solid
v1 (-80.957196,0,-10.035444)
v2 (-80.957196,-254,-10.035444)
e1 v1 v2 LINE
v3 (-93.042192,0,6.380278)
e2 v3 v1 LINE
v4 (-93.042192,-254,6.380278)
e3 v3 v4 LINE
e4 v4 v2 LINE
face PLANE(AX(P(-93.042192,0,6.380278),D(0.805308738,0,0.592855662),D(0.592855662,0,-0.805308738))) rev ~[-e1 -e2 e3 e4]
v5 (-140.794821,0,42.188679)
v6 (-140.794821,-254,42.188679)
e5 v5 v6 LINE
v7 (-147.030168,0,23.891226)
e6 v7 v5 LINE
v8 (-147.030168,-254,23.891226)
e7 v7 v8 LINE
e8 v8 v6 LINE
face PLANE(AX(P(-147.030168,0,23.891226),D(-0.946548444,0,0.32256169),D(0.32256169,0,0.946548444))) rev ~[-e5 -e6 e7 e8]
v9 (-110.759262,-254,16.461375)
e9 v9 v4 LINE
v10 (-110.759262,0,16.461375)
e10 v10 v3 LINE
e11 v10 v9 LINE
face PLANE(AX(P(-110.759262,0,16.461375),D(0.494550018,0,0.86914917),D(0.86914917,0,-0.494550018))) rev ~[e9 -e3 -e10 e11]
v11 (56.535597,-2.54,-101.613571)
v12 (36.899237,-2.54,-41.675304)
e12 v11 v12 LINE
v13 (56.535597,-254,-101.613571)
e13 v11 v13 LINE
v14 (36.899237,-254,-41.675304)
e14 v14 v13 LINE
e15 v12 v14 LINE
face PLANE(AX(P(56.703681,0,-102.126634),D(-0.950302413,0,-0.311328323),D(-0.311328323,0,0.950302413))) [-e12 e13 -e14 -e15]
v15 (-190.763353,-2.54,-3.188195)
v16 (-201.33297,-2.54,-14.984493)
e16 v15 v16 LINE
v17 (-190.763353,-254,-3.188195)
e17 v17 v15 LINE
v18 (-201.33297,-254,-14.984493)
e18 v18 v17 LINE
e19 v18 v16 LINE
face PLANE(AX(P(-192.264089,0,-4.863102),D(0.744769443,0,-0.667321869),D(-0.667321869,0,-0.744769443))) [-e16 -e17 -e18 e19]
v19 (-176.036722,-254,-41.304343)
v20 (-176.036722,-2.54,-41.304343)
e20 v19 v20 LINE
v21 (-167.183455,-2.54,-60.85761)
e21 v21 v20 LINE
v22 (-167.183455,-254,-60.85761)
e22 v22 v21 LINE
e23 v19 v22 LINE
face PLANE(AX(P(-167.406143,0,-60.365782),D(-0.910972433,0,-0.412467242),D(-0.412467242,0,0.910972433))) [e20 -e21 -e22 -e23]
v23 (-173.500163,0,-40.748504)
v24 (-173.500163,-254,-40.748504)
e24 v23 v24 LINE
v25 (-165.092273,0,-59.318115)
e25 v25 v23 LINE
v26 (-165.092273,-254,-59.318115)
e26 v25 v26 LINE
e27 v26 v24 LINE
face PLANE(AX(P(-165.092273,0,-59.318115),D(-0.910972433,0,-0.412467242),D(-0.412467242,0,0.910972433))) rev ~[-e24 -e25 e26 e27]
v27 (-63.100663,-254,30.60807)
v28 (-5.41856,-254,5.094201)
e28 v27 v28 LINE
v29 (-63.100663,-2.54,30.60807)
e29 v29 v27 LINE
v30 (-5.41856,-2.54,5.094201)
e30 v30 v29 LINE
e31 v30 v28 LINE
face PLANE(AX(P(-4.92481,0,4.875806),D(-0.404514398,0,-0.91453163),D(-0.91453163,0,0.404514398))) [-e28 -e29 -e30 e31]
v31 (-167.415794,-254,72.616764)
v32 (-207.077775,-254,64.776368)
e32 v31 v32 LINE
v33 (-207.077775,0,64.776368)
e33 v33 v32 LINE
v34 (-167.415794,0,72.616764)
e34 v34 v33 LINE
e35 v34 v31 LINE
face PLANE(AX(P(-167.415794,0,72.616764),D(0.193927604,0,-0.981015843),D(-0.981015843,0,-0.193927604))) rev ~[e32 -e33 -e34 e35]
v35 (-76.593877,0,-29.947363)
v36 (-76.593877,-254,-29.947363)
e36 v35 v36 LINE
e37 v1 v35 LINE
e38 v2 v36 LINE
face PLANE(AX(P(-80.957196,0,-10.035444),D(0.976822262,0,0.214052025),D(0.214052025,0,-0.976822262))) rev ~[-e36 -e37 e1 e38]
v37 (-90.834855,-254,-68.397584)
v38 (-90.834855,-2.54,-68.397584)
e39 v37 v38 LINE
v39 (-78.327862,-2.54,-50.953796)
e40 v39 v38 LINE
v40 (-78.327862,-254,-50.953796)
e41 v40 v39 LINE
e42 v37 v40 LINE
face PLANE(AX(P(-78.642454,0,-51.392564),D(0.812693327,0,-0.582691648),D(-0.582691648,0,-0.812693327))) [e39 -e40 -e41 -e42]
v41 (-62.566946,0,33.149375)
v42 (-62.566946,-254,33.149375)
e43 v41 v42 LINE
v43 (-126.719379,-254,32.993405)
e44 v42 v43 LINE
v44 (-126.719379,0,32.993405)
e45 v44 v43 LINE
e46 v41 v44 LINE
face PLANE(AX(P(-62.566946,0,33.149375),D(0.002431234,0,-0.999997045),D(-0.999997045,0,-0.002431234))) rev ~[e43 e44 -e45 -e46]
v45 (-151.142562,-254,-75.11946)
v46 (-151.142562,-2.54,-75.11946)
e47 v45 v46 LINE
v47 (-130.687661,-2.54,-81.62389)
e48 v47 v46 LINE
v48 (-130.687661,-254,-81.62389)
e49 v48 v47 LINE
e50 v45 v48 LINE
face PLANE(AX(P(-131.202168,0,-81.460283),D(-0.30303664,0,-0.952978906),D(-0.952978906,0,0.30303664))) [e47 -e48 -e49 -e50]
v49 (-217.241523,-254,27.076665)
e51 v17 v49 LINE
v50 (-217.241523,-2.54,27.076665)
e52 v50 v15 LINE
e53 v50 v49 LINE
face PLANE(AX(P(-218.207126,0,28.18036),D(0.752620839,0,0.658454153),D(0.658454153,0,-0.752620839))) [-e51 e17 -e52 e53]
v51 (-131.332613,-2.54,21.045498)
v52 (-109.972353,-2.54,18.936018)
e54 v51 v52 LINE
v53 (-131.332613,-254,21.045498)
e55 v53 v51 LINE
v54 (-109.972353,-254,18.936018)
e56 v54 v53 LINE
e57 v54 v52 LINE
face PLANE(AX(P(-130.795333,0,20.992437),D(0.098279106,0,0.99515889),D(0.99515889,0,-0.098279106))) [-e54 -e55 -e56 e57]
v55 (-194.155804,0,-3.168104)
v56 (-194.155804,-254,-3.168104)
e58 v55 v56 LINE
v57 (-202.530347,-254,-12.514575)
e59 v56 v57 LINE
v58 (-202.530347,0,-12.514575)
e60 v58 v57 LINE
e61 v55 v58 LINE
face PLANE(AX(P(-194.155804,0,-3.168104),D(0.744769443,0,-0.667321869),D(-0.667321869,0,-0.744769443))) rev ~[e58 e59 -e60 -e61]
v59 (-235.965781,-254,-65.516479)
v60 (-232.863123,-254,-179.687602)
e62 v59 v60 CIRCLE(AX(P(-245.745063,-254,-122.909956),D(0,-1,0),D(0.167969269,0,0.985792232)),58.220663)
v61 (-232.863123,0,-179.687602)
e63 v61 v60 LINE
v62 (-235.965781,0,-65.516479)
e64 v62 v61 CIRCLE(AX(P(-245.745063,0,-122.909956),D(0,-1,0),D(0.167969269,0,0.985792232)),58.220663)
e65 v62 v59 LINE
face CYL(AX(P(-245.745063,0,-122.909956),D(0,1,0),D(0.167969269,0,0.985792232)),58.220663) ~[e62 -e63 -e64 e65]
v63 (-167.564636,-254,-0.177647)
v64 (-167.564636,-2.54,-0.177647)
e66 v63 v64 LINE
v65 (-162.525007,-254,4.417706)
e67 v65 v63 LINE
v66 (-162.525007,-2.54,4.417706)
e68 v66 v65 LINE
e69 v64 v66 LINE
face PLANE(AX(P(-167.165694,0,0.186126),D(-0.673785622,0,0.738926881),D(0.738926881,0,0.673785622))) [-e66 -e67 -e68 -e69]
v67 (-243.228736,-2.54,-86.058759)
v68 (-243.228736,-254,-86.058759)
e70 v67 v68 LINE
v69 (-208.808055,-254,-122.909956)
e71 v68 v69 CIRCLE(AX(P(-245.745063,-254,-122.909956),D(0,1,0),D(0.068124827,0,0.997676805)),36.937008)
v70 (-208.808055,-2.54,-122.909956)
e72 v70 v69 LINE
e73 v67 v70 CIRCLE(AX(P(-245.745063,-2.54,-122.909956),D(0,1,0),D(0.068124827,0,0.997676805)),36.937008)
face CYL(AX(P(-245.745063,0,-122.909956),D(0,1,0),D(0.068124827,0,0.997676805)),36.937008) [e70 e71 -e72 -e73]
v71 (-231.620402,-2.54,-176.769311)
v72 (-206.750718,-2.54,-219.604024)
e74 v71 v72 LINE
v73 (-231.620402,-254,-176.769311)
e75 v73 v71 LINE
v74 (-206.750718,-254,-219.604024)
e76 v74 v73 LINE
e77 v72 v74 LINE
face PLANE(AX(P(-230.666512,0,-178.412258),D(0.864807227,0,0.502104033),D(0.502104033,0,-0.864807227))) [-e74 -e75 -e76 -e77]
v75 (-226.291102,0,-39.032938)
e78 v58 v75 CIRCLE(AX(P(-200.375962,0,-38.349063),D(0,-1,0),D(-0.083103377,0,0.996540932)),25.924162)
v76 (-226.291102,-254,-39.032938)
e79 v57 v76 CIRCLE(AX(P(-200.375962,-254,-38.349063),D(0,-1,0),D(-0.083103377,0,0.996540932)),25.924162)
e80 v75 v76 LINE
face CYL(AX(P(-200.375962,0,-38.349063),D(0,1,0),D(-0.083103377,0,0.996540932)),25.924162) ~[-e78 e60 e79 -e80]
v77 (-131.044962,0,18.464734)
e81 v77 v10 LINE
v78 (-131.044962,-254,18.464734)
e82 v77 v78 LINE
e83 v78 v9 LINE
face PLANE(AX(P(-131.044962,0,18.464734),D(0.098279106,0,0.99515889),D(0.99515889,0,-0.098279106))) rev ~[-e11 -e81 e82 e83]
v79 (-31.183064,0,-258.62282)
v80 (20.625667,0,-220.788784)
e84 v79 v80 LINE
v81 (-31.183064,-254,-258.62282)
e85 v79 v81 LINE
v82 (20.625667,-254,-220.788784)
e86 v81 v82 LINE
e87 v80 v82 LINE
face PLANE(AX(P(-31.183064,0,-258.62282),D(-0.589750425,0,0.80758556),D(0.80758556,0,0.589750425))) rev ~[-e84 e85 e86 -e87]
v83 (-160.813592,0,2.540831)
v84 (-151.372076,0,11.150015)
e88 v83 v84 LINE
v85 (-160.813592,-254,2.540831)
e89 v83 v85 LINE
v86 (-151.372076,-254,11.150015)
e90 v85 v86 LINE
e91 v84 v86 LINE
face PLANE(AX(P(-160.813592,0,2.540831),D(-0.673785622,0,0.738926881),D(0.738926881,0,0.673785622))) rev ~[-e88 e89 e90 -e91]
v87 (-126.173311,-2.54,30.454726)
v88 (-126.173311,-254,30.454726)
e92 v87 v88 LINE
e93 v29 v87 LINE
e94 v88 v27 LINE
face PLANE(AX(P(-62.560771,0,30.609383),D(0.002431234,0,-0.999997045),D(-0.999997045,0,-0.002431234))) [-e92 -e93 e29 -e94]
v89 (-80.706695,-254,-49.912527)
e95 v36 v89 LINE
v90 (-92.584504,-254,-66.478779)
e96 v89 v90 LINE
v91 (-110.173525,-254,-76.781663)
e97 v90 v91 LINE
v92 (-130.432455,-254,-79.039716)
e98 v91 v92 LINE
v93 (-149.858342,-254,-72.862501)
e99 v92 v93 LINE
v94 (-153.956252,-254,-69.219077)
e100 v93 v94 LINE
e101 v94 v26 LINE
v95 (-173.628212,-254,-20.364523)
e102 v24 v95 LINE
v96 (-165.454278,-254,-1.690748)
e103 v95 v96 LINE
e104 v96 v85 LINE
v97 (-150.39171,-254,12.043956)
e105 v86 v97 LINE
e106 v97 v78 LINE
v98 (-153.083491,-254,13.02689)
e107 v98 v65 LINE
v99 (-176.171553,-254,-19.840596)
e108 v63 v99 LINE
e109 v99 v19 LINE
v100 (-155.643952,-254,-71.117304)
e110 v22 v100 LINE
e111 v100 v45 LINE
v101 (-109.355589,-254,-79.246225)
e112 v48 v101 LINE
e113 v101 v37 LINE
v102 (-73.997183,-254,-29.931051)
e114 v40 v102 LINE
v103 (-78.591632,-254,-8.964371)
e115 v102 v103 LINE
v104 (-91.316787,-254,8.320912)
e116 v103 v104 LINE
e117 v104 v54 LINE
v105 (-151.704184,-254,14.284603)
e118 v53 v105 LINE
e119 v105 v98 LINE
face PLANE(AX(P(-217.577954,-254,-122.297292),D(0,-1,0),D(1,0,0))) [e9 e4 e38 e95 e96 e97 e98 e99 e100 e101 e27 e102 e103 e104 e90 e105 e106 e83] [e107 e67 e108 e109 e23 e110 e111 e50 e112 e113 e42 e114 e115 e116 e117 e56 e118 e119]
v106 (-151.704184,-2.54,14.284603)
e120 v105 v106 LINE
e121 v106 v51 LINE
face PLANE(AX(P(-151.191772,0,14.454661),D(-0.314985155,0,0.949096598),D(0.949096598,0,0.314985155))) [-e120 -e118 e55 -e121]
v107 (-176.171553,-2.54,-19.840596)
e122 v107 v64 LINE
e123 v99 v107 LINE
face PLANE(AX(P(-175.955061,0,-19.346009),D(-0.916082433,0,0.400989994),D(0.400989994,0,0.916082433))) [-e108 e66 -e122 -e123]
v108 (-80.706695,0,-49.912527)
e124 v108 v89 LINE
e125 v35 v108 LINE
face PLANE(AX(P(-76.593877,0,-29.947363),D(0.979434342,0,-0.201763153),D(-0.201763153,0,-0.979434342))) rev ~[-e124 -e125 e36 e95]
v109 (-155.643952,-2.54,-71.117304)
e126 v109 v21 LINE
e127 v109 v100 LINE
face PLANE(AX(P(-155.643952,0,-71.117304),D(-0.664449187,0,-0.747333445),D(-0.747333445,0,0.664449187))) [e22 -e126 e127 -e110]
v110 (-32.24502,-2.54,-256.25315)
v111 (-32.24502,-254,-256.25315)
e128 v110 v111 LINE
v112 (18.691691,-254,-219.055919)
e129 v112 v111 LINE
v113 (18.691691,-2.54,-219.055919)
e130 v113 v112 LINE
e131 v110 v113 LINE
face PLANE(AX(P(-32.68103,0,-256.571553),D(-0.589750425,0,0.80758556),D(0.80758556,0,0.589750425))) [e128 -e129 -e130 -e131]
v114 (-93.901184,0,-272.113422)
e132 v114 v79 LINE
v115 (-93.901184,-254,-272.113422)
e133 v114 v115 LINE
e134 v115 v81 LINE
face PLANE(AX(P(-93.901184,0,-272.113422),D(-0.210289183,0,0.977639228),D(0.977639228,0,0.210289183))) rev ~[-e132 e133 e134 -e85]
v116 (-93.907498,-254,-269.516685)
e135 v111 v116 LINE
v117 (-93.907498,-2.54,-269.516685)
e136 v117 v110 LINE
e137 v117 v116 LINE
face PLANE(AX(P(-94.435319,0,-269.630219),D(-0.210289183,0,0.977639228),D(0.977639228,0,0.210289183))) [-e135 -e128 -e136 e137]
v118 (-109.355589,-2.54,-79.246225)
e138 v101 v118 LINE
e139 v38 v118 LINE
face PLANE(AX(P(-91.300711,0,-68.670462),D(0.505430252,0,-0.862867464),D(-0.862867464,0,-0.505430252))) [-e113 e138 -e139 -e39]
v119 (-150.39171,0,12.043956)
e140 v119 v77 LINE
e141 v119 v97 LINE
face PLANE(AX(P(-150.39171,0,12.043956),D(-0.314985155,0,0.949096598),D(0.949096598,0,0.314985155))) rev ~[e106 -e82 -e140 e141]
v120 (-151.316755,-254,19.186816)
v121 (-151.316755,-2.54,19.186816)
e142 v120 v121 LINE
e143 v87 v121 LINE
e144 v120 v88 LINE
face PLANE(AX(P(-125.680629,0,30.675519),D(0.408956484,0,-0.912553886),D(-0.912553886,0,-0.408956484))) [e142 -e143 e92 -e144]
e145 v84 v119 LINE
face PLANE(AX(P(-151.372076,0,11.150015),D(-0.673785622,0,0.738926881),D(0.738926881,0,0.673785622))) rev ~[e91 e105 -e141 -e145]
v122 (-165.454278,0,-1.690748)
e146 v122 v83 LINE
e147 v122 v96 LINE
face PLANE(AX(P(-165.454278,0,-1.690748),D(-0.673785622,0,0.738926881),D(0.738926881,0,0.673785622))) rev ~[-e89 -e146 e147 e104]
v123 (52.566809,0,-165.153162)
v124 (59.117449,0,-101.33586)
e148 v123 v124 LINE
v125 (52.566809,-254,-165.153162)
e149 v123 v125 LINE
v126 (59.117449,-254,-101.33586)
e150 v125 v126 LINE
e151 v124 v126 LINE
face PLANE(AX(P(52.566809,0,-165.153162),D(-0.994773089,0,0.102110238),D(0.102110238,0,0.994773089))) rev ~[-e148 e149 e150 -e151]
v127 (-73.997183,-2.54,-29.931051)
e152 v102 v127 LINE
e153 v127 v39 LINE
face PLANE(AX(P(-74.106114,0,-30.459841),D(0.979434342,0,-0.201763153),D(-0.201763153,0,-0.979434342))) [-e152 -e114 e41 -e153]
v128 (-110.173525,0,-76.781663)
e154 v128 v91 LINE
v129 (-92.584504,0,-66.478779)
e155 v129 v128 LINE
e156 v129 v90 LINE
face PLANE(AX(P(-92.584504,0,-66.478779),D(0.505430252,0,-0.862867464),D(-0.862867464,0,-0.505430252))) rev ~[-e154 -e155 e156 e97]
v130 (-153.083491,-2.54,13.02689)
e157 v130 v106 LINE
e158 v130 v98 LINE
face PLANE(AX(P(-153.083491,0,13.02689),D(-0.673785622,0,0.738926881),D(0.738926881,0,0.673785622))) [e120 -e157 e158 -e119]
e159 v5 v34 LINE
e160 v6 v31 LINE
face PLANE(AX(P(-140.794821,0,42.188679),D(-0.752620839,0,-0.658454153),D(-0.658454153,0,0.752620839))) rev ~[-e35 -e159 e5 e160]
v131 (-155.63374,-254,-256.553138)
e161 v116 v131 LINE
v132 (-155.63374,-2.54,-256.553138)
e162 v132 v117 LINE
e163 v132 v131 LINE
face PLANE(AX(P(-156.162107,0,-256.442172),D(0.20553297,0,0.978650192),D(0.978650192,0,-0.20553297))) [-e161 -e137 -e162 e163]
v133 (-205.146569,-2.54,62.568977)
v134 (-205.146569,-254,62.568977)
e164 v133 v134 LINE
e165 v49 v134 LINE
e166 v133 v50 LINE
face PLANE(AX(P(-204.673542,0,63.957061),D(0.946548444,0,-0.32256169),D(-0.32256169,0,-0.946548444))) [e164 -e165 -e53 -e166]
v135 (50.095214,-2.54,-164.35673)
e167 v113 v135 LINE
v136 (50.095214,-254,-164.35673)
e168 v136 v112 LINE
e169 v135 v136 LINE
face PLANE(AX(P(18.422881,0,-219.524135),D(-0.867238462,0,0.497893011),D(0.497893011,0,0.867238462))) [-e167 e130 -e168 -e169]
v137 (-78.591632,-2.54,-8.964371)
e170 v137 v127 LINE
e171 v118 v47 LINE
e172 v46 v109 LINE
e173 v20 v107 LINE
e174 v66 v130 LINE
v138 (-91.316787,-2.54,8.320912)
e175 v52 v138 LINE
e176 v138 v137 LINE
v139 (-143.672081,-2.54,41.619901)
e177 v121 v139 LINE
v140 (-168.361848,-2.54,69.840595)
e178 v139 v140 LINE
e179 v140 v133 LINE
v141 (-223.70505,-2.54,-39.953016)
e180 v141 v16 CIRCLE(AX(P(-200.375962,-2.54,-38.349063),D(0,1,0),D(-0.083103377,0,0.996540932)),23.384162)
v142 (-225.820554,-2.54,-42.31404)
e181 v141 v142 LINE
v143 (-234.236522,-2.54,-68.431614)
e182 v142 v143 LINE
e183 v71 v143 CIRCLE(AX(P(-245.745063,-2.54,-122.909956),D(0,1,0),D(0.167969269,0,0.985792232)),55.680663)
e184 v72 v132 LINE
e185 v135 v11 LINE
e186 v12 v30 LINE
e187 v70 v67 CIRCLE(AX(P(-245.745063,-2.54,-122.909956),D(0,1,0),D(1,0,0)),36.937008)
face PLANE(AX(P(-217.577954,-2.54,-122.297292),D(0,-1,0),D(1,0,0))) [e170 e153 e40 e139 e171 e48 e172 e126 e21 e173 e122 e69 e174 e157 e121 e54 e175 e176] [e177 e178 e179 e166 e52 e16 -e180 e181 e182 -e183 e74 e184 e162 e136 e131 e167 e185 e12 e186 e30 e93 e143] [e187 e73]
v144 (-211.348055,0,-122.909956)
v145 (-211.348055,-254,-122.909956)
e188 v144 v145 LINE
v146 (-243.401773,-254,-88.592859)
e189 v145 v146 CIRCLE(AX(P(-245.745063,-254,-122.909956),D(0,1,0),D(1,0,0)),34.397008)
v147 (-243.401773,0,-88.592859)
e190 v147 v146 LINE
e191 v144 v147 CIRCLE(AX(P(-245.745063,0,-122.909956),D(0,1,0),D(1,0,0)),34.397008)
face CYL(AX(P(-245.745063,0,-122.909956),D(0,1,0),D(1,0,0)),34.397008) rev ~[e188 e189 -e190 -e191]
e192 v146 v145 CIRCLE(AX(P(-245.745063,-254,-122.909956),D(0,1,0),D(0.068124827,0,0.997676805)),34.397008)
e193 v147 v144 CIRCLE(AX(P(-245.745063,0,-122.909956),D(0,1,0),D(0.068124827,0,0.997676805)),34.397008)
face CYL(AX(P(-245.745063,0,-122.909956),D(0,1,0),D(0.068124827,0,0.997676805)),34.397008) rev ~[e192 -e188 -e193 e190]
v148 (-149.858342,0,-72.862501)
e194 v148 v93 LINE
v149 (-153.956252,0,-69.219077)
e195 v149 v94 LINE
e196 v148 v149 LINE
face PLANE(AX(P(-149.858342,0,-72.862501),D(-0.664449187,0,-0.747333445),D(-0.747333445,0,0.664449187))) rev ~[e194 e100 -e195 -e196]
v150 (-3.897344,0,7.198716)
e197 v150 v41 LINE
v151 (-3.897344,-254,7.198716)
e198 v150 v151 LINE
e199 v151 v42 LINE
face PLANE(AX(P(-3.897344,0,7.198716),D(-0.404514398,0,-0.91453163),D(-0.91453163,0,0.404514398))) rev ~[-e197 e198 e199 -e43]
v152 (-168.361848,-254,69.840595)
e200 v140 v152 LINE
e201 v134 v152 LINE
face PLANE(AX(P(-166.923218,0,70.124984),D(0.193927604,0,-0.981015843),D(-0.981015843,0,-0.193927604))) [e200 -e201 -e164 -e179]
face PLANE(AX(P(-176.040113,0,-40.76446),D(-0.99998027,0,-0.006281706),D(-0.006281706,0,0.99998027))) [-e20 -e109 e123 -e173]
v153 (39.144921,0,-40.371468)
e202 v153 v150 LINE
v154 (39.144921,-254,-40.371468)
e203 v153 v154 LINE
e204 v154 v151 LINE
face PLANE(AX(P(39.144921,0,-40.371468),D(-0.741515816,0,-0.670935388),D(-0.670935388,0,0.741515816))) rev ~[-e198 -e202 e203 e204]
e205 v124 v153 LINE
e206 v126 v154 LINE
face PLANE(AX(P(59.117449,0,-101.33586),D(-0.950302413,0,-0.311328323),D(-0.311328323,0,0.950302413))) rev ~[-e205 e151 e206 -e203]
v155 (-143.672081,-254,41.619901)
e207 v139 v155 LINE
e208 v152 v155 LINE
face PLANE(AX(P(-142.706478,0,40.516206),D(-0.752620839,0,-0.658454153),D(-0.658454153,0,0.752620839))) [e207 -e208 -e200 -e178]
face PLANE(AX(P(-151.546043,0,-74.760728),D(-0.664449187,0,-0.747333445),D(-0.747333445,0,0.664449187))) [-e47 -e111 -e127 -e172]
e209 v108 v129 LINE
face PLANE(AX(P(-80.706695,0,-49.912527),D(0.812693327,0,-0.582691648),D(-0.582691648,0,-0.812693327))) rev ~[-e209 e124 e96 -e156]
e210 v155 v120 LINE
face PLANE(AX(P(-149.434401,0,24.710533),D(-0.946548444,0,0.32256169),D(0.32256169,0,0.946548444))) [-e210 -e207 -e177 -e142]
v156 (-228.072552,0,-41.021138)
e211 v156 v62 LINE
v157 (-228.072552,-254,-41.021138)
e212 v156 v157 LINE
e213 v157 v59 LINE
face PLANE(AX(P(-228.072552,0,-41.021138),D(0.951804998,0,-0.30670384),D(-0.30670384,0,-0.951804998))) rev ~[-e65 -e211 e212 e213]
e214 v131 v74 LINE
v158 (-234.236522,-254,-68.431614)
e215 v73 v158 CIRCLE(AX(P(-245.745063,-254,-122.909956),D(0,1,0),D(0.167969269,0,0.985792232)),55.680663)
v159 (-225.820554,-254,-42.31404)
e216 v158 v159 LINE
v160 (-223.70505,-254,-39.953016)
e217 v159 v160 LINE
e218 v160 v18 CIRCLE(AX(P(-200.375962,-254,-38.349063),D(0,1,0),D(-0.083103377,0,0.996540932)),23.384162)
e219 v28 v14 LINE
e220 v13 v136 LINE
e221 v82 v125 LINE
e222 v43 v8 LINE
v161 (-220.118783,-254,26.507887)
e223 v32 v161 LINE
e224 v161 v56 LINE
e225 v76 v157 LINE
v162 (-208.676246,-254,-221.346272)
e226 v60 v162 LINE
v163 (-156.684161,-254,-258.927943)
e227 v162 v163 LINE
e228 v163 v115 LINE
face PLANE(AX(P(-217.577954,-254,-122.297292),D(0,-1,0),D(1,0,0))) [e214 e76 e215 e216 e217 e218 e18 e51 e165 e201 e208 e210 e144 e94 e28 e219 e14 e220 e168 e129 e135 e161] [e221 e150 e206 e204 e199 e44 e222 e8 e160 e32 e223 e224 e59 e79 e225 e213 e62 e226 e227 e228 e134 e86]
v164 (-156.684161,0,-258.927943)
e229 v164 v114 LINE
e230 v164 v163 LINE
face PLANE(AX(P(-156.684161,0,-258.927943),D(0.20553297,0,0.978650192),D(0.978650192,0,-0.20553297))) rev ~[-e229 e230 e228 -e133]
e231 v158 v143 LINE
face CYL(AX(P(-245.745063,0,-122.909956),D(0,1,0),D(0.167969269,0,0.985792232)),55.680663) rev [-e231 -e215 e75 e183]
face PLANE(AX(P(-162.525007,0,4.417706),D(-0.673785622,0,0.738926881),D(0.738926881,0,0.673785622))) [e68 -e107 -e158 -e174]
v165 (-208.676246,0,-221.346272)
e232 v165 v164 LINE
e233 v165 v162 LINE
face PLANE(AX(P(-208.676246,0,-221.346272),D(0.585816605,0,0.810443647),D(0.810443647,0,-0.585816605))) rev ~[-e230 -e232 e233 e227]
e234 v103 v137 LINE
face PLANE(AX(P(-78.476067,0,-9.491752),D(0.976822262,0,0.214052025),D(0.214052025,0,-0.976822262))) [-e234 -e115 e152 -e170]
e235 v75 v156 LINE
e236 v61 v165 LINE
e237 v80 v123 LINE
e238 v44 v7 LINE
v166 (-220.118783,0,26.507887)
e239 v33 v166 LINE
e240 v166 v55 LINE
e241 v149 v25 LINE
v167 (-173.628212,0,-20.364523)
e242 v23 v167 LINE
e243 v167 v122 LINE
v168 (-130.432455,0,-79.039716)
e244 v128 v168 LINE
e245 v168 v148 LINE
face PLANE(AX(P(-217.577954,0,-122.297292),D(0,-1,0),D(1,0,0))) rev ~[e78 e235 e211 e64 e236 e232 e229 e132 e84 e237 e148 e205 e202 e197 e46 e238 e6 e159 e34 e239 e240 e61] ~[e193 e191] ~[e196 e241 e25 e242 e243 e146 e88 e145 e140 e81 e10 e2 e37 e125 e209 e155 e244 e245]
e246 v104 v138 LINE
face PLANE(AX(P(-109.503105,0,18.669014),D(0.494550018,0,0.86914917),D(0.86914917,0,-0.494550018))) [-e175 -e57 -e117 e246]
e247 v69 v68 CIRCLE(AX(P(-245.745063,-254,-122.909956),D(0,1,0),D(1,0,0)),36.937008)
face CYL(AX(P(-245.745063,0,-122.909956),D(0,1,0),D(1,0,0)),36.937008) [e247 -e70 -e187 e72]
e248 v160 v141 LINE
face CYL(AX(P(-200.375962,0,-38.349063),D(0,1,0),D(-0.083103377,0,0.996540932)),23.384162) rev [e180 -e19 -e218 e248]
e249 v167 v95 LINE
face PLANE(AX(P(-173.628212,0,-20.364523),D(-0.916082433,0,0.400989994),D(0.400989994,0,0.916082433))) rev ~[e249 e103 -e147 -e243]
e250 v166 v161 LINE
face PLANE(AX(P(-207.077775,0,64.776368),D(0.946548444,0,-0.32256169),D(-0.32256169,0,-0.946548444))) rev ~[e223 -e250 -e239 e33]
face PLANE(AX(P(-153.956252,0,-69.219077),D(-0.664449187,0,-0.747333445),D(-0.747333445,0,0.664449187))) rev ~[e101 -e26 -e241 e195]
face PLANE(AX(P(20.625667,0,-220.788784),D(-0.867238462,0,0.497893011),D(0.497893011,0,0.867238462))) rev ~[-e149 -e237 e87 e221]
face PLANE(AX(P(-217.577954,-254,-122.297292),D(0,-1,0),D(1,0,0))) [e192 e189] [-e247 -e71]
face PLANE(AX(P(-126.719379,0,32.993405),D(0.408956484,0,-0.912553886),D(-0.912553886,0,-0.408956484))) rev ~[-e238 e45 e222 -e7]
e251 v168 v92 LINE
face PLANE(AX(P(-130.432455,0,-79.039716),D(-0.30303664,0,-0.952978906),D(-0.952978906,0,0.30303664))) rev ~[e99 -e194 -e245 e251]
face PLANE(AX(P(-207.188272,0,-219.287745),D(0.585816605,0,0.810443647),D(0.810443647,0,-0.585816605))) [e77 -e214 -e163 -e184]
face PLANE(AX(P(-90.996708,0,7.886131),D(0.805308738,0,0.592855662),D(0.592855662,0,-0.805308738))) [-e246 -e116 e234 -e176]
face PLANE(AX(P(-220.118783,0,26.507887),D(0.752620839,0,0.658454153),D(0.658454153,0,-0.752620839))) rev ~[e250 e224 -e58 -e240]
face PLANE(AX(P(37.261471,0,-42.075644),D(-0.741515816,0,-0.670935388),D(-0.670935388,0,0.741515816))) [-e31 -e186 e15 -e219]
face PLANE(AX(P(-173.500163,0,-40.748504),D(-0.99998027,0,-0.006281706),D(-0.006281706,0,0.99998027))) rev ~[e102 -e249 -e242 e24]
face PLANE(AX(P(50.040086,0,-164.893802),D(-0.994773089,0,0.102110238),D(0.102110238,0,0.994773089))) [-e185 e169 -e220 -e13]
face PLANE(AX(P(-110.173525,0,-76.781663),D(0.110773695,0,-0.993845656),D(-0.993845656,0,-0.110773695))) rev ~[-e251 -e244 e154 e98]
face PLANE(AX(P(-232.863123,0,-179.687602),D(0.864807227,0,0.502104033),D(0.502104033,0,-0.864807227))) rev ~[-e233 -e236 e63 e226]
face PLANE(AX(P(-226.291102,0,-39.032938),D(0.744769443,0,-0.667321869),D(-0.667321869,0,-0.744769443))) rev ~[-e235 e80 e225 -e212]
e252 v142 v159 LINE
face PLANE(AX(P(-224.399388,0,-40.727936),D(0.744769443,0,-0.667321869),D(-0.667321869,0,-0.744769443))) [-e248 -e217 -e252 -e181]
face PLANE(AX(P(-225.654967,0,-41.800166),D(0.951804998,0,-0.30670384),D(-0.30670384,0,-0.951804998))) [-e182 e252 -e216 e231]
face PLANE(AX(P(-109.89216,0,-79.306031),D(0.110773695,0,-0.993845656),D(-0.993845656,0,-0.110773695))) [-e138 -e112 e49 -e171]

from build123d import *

# Parameters (mm, degrees)
F1_DEPTH = 254
F2_T     = -2.54


with BuildPart() as f1:
    # F0 (on Front) → F1 (new body)
    with BuildSketch(Plane.XZ):
        with BuildLine():
            ThreePointArc((-243.4017726194, -88.5928585449), (-220.6078758628, -99.4306883092), (-211.3480547487, -122.9099556804))
            ThreePointArc((-211.3480547487, -122.9099556804), (-220.0765697788, -145.8071744938), (-241.8322543151, -157.0836896635))
            Line((-241.8322543151, -157.0836896635), (-240.887536248, -165.8666205301))
            Line((-240.887536248, -165.8666205301), (-232.8631227599, -179.6876024772))
            ThreePointArc((-232.8631227599, -179.6876024772), (-200.2497848188, -159.2393547198), (-187.5244002098, -122.9099556804))
            ThreePointArc((-187.5244002098, -122.9099556804), (-201.2534802405, -85.358063124), (-235.9657806801, -65.5164787306))
            Line((-235.9657806801, -65.5164787306), (-243.4017726194, -88.5928585449))
        make_face()
        with BuildLine():
            ThreePointArc((-241.8322543151, -157.0836896635), (-280.1330429902, -123.6979818064), (-243.4017726194, -88.5928585449))
            Line((-243.4017726194, -88.5928585449), (-235.9657806801, -65.5164787306))
            ThreePointArc((-235.9657806801, -65.5164787306), (-303.9442391321, -124.4915476748), (-232.8631227599, -179.6876024772))
            Line((-232.8631227599, -179.6876024772), (-240.887536248, -165.8666205301))
            Line((-240.887536248, -165.8666205301), (-241.8322543151, -157.0836896635))
        make_face()
        with BuildLine():
            Line((-228.0725515097, -41.0211382589), (-235.9657806801, -65.5164787306))
            ThreePointArc((-235.9657806801, -65.5164787306), (-201.2534802405, -85.358063124), (-187.5244002098, -122.9099556804))
            ThreePointArc((-187.5244002098, -122.9099556804), (-200.2497848188, -159.2393547198), (-232.8631227599, -179.6876024772))
            Line((-232.8631227599, -179.6876024772), (-208.6762458399, -221.3462719571))
            Line((-208.6762458399, -221.3462719571), (-156.6841606223, -258.9279433801))
            Line((-156.6841606223, -258.9279433801), (-93.9011844627, -272.1134223913))
            Line((-93.9011844627, -272.1134223913), (-31.1830643044, -258.6228198834))
            Line((-31.1830643044, -258.6228198834), (20.6256671009, -220.7887835882))
            Line((20.6256671009, -220.7887835882), (52.5668094258, -165.1531620926))
            Line((52.5668094258, -165.1531620926), (59.117448986, -101.335859787))
            Line((59.117448986, -101.335859787), (39.144920691, -40.3714680019))
            Line((39.144920691, -40.3714680019), (-3.8973438724, 7.1987160788))
            Line((-3.8973438724, 7.1987160788), (-62.5669461344, 33.1493754661))
            Line((-62.5669461344, 33.1493754661), (-126.7193788673, 32.9934053975))
            Line((-126.7193788673, 32.9934053975), (-147.0301676591, 23.8912264385))
            Line((-147.0301676591, 23.8912264385), (-151.3720759465, 11.1500154879))
            Line((-151.3720759465, 11.1500154879), (-150.3917100203, 12.0439557169))
            Line((-150.3917100203, 12.0439557169), (-131.0449616301, 18.4647337066))
            Line((-131.0449616301, 18.4647337066), (-110.7592618326, 16.461374779))
            Line((-110.7592618326, 16.461374779), (-93.0421924126, 6.3802778925))
            Line((-93.0421924126, 6.3802778925), (-80.9571956273, -10.0354437172))
            Line((-80.9571956273, -10.0354437172), (-76.5938772097, -29.9473626517))
            Line((-76.5938772097, -29.9473626517), (-80.7066945537, -49.9125272331))
            Line((-80.7066945537, -49.9125272331), (-92.5845041767, -66.4787791275))
            Line((-92.5845041767, -66.4787791275), (-110.1735248884, -76.7816628826))
            Line((-110.1735248884, -76.7816628826), (-130.4324552165, -79.0397162985))
            Line((-130.4324552165, -79.0397162985), (-149.8583420607, -72.8625014256))
            Line((-149.8583420607, -72.8625014256), (-153.9562515064, -69.2190774413))
            Line((-153.9562515064, -69.2190774413), (-165.0922731069, -59.3181148339))
            Line((-165.0922731069, -59.3181148339), (-173.5001632814, -40.7485040119))
            Line((-173.5001632814, -40.7485040119), (-173.6282119898, -20.3645233703))
            Line((-173.6282119898, -20.3645233703), (-165.4542784469, -1.6907483448))
            Line((-165.4542784469, -1.6907483448), (-160.8135918091, 2.5408312775))
            Line((-160.8135918091, 2.5408312775), (-193.497810345, -3.9201981196))
            Line((-193.497810345, -3.9201981196), (-194.1558035405, -3.1681041604))
            Line((-194.1558035405, -3.1681041604), (-202.5303474039, -12.5145749574))
            Line((-202.5303474039, -12.5145749574), (-226.2911018969, -39.0329384174))
            Line((-226.2911018969, -39.0329384174), (-228.0725515097, -41.0211382589))
        make_face()
        with BuildLine():
            ThreePointArc((-202.5303474039, -12.5145749574), (-219.6834854839, -21.0493031647), (-226.2911018969, -39.0329384174))
            Line((-226.2911018969, -39.0329384174), (-202.5303474039, -12.5145749574))
        make_face()
        Polygon((-185.2621036451, 6.7577745149), (-194.1558035405, -3.1681041604), (-193.497810345, -3.9201981196), (-160.8135918091, 2.5408312775), (-151.3720759465, 11.1500154879), (-147.0301676591, 23.8912264385), align=None)
        Polygon((-220.1187830788, 26.5078867238), (-194.1558035405, -3.1681041604), (-185.2621036451, 6.7577745149), (-147.0301676591, 23.8912264385), (-140.7948214191, 42.1886792022), (-167.4157941529, 72.6167640457), (-207.0777749827, 64.7763678065), align=None)
    extrude(amount=F1_DEPTH)

    # F2
    f2_openings = [f1.faces().sort_by_distance(p)[0] for p in [
        (-102.007505, -254, -118.633515),
    ]]
    offset(amount=F2_T, openings=f2_openings, kind=Kind.INTERSECTION)


solid = f1.part
